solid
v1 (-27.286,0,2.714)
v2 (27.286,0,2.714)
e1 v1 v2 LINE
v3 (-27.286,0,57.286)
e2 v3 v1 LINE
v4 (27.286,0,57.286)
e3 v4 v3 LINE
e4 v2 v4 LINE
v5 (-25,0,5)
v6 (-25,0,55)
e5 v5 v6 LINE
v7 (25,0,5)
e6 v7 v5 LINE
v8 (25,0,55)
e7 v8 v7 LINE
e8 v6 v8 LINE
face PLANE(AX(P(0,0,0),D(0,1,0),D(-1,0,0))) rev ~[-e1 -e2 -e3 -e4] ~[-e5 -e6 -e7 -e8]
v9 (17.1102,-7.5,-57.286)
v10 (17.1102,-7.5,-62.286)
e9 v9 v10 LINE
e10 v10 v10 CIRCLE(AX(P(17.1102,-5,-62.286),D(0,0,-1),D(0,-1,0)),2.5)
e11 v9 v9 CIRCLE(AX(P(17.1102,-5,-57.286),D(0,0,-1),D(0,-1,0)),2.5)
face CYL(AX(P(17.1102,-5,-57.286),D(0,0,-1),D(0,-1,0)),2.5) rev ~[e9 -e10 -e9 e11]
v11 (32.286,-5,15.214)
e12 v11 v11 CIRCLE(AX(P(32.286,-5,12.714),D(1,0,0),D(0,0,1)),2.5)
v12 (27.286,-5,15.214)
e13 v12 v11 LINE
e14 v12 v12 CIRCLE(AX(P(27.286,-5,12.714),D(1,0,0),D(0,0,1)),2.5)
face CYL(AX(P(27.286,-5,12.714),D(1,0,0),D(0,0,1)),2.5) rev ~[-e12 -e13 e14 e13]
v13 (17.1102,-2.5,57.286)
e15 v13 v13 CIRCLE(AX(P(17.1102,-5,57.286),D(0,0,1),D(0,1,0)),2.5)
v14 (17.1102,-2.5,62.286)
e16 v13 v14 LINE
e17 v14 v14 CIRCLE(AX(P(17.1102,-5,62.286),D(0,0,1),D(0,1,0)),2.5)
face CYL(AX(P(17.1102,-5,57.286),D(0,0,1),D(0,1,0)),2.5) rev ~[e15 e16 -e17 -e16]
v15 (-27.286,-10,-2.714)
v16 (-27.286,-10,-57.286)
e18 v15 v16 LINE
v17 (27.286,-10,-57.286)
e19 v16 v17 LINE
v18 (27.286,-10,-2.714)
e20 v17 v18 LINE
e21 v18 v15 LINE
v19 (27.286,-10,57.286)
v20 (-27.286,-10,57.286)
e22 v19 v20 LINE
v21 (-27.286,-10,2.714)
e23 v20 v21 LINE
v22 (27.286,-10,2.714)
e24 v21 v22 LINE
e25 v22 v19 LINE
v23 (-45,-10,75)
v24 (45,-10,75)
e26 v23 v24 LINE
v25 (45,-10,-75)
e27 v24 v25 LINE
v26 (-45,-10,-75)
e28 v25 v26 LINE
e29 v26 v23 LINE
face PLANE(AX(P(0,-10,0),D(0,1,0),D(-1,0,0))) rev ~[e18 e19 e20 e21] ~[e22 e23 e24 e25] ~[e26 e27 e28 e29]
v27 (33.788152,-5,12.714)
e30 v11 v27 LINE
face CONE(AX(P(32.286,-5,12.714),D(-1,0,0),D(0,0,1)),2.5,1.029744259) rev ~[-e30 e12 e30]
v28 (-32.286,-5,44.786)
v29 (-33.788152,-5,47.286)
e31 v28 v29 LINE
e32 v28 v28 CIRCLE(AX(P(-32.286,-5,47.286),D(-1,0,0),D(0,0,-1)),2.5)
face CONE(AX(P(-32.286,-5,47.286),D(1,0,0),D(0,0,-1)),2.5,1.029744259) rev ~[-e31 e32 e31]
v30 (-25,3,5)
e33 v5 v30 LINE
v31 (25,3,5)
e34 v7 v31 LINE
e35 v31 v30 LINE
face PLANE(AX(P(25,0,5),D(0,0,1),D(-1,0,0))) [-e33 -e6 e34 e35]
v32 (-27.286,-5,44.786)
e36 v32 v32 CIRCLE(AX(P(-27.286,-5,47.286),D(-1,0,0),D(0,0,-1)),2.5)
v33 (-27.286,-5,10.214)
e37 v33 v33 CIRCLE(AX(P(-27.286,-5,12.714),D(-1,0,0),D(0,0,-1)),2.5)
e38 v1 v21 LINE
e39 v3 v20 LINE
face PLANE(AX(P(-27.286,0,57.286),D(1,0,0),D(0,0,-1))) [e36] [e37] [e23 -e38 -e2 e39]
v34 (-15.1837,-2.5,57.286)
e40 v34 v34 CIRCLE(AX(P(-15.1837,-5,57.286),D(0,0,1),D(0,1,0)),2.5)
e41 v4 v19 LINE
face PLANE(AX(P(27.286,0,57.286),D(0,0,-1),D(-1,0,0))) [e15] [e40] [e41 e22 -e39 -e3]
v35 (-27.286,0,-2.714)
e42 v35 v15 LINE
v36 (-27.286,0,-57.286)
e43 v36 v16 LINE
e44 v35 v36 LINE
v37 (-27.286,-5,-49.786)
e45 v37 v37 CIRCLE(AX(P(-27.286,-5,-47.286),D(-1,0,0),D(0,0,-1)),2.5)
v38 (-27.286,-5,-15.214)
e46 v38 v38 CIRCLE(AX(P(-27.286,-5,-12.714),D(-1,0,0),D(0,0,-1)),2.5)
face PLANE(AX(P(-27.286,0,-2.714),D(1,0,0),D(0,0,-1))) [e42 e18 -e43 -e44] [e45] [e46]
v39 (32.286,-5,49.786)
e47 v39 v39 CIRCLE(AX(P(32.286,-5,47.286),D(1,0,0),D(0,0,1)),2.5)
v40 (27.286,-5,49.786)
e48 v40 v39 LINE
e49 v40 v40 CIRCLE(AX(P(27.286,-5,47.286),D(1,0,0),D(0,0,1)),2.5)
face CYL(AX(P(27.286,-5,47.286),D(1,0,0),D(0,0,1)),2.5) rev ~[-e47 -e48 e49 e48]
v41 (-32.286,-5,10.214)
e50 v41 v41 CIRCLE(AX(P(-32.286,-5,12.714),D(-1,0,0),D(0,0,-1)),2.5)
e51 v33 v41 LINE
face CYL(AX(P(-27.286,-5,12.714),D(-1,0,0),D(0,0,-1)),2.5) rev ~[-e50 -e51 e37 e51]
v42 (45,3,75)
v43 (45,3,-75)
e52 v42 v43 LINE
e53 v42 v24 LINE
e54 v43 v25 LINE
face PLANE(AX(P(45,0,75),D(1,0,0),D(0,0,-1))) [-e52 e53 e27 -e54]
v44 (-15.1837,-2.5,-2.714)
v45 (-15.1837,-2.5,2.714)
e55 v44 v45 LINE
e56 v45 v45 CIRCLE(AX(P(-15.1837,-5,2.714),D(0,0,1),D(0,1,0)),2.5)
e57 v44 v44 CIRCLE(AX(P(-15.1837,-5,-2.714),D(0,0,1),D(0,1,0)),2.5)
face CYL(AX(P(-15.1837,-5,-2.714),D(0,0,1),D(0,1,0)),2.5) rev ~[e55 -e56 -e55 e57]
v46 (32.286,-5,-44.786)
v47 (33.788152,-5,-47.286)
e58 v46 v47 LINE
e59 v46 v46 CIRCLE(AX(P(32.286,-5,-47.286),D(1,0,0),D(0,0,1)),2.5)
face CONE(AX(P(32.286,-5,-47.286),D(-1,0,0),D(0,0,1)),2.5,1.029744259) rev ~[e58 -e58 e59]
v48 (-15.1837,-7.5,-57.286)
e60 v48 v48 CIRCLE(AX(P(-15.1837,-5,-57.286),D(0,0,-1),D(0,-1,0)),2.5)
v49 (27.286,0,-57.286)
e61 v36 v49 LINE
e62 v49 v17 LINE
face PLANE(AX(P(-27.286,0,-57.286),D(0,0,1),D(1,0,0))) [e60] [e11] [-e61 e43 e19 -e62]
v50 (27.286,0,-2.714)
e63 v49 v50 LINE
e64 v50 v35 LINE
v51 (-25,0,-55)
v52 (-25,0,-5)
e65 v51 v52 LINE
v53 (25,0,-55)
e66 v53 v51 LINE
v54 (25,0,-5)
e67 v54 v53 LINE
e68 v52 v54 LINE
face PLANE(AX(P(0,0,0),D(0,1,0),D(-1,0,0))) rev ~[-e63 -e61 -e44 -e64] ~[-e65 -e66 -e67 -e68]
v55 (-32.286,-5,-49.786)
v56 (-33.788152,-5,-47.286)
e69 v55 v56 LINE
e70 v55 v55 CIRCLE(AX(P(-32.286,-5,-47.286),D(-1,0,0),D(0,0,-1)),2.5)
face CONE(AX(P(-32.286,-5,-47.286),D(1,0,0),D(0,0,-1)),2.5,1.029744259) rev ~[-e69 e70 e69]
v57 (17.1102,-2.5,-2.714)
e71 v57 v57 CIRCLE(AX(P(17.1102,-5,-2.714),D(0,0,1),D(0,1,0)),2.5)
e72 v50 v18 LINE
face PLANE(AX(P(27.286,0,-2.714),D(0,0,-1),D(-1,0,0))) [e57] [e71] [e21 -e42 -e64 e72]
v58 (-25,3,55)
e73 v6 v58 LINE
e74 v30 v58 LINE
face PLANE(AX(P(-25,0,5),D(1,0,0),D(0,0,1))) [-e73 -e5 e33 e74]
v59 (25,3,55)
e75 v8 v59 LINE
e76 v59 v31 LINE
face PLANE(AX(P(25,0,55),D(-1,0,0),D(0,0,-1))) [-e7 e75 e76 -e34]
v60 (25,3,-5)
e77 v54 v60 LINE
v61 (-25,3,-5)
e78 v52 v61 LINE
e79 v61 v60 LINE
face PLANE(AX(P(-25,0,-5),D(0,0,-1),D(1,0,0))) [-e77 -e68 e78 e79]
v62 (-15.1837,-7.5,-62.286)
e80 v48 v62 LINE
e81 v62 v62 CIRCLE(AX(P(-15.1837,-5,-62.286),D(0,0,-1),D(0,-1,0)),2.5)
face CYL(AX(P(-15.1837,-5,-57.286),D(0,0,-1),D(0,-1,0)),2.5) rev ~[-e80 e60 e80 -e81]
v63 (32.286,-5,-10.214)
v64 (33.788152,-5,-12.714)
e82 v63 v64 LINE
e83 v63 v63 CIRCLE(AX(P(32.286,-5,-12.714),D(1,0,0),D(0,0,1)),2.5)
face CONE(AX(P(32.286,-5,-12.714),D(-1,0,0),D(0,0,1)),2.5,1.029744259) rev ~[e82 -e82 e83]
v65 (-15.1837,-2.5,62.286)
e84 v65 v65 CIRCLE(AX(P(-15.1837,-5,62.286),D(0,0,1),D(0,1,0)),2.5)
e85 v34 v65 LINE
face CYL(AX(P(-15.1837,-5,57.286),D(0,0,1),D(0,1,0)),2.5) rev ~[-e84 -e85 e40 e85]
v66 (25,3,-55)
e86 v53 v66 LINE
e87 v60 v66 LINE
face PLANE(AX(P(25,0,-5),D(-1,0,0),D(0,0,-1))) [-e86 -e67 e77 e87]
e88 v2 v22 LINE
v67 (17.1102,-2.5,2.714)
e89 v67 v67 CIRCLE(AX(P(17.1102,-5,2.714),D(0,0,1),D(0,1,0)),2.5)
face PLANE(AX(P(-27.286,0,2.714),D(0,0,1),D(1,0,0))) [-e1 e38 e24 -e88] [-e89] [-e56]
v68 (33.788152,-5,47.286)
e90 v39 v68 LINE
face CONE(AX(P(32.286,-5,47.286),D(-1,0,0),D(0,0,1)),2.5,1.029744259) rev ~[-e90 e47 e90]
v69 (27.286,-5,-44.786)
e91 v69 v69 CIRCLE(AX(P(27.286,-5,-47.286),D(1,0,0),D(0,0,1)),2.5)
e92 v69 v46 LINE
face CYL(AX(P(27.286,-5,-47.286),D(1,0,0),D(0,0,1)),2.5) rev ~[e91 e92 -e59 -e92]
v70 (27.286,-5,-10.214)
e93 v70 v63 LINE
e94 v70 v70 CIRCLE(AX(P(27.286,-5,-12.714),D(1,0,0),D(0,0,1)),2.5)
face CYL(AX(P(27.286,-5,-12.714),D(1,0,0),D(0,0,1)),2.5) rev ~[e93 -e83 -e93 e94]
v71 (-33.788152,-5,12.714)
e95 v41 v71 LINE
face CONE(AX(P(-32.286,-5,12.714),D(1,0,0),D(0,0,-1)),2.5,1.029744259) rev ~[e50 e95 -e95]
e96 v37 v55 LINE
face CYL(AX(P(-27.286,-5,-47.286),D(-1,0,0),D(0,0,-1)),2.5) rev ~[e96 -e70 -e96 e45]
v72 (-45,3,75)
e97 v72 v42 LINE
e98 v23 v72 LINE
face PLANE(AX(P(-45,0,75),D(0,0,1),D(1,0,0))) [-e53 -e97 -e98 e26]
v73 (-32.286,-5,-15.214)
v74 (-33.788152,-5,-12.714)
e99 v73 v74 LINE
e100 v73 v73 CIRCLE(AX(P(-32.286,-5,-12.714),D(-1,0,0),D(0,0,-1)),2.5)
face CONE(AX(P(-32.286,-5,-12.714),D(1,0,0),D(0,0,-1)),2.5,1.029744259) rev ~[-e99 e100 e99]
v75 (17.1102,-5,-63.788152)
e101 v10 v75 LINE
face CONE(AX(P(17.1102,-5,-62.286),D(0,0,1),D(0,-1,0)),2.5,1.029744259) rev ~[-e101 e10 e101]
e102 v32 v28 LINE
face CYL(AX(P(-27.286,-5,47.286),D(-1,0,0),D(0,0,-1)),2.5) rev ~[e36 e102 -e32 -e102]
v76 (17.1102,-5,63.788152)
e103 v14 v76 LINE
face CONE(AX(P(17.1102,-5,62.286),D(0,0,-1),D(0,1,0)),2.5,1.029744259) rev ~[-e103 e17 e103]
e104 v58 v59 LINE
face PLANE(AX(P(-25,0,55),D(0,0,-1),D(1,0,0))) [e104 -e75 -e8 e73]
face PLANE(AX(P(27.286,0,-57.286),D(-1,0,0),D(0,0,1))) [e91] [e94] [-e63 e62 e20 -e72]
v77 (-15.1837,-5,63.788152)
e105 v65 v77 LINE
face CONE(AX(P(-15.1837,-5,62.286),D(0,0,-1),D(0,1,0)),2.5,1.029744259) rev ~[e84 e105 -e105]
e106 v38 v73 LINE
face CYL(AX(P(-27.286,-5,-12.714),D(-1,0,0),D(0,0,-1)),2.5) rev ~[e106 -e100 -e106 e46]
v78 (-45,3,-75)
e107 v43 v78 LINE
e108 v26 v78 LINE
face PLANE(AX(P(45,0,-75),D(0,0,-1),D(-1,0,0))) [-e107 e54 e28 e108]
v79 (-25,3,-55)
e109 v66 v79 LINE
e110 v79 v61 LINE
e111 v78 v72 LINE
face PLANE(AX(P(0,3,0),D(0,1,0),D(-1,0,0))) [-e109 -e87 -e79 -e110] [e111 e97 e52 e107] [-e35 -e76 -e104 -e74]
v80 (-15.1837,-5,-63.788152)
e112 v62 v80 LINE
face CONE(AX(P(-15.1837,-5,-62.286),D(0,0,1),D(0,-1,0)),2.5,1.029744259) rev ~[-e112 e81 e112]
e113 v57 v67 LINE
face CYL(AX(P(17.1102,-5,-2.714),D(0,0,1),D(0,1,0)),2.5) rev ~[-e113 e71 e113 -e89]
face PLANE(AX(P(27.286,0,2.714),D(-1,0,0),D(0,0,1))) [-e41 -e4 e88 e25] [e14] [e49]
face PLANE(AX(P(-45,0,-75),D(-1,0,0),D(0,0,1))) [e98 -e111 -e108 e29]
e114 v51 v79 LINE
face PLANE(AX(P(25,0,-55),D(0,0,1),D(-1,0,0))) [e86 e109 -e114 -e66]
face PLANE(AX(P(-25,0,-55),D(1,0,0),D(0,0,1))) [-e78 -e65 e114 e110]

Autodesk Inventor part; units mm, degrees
ref_plane "YZ Plane" through (0, 0, 0) normal (1, 0, 0) x (0, 1, 0)
ref_plane "XZ Plane" through (0, 0, 0) normal (0, 1, 0) x (-1, 0, 0)
ref_plane "XY Plane" through (0, 0, 0) normal (0, 0, 1) x (1, 0, 0)
sketch "Sketch8" plane through (0, 0, 0) normal (0, 1, 0) x (-1, 0, 0)
  line L0 (45, -75) -> (45, 75) projected
  line L1 (45, 75) -> (-45, 75) projected
  line L2 (-45, 75) -> (-45, -75) projected
  line L3 (-45, -75) -> (45, -75) projected
  line L4 (-27.286, -57.286) -> (-27.286, -2.714) projected
  line L5 (27.286, -57.286) -> (-27.286, -57.286) projected
  line L6 (27.286, -2.714) -> (27.286, -57.286) projected
  line L7 (-27.286, -2.714) -> (27.286, -2.714) projected
  line L8 (27.286, 57.286) -> (27.286, 2.714) projected
  line L9 (27.286, 2.714) -> (-27.286, 2.714) projected
  line L10 (-27.286, 57.286) -> (27.286, 57.286) projected
  line L11 (-27.286, 2.714) -> (-27.286, 57.286) projected
  point P0 (0, 0)
extrude "Extrusion7" add sketch "Sketch8" against normal blind 10
sketch "Sketch2" plane through (0, 0, 0) normal (0, 1, 0) x (-1, 0, 0)
  line L0 (45, 75) -> (-45, 75)
  line L1 (-45, -75) -> (45, -75)
  line L2 (45, -75) -> (45, 75)
  line L3 (-45, 75) -> (-45, -75)
  line L4 (-25, -55) -> (25, -55)
  line L5 (25, -55) -> (25, -5)
  line L6 (25, -5) -> (-25, -5)
  line L7 (-25, -5) -> (-25, -55)
  line L8 (-25, 5) -> (25, 5)
  line L9 (25, 5) -> (25, 55)
  line L10 (25, 55) -> (-25, 55)
  line L11 (-25, 55) -> (-25, 5)
  line L12 (-27.286, 57.286) -> (27.286, 57.286)
  line L13 (27.286, 57.286) -> (27.286, 2.714)
  line L14 (27.286, 2.714) -> (-27.286, 2.714)
  line L15 (-27.286, 2.714) -> (-27.286, 57.286)
  line L16 (-27.286, -2.714) -> (27.286, -2.714)
  line L17 (27.286, -2.714) -> (27.286, -57.286)
  line L18 (27.286, -57.286) -> (-27.286, -57.286)
  line L19 (-27.286, -57.286) -> (-27.286, -2.714)
  point P0 (0, 0)
extrude "Extrusion8" add sketch "Sketch2" along normal blind 3 contours L2 L1 L3 L0 | L12 L13 L14 L15 | L16 L17 L18 L19
hole "Hole1" at (27.286, -5, 12.714) at (27.286, -5, 47.286) at (27.286, -5, -12.714) at (27.286, -5, -47.286) direction (1, 0, 0) diameter 5 depth 5 tip angle 118
hole "Hole2" at (-15.1837, -5, -57.286) at (17.1102, -5, -57.286) direction (0, 0, -1) diameter 5 depth 5 tip angle 118
hole "Hole3" at (-27.286, -5, 47.286) at (-27.286, -5, 12.714) at (-27.286, -5, -12.714) at (-27.286, -5, -47.286) direction (-1, 0, 0) diameter 5 depth 5 tip angle 118
hole "Hole5" at (17.1102, -5, 57.286) at (-15.1837, -5, 57.286) direction (0, 0, 1) diameter 5 depth 5 tip angle 118
hole "Hole6" at (-15.1837, -5, -2.714) at (17.1102, -5, -2.714) direction (0, 0, 1) diameter 5 end up to surface
properties part number "top_plate"
